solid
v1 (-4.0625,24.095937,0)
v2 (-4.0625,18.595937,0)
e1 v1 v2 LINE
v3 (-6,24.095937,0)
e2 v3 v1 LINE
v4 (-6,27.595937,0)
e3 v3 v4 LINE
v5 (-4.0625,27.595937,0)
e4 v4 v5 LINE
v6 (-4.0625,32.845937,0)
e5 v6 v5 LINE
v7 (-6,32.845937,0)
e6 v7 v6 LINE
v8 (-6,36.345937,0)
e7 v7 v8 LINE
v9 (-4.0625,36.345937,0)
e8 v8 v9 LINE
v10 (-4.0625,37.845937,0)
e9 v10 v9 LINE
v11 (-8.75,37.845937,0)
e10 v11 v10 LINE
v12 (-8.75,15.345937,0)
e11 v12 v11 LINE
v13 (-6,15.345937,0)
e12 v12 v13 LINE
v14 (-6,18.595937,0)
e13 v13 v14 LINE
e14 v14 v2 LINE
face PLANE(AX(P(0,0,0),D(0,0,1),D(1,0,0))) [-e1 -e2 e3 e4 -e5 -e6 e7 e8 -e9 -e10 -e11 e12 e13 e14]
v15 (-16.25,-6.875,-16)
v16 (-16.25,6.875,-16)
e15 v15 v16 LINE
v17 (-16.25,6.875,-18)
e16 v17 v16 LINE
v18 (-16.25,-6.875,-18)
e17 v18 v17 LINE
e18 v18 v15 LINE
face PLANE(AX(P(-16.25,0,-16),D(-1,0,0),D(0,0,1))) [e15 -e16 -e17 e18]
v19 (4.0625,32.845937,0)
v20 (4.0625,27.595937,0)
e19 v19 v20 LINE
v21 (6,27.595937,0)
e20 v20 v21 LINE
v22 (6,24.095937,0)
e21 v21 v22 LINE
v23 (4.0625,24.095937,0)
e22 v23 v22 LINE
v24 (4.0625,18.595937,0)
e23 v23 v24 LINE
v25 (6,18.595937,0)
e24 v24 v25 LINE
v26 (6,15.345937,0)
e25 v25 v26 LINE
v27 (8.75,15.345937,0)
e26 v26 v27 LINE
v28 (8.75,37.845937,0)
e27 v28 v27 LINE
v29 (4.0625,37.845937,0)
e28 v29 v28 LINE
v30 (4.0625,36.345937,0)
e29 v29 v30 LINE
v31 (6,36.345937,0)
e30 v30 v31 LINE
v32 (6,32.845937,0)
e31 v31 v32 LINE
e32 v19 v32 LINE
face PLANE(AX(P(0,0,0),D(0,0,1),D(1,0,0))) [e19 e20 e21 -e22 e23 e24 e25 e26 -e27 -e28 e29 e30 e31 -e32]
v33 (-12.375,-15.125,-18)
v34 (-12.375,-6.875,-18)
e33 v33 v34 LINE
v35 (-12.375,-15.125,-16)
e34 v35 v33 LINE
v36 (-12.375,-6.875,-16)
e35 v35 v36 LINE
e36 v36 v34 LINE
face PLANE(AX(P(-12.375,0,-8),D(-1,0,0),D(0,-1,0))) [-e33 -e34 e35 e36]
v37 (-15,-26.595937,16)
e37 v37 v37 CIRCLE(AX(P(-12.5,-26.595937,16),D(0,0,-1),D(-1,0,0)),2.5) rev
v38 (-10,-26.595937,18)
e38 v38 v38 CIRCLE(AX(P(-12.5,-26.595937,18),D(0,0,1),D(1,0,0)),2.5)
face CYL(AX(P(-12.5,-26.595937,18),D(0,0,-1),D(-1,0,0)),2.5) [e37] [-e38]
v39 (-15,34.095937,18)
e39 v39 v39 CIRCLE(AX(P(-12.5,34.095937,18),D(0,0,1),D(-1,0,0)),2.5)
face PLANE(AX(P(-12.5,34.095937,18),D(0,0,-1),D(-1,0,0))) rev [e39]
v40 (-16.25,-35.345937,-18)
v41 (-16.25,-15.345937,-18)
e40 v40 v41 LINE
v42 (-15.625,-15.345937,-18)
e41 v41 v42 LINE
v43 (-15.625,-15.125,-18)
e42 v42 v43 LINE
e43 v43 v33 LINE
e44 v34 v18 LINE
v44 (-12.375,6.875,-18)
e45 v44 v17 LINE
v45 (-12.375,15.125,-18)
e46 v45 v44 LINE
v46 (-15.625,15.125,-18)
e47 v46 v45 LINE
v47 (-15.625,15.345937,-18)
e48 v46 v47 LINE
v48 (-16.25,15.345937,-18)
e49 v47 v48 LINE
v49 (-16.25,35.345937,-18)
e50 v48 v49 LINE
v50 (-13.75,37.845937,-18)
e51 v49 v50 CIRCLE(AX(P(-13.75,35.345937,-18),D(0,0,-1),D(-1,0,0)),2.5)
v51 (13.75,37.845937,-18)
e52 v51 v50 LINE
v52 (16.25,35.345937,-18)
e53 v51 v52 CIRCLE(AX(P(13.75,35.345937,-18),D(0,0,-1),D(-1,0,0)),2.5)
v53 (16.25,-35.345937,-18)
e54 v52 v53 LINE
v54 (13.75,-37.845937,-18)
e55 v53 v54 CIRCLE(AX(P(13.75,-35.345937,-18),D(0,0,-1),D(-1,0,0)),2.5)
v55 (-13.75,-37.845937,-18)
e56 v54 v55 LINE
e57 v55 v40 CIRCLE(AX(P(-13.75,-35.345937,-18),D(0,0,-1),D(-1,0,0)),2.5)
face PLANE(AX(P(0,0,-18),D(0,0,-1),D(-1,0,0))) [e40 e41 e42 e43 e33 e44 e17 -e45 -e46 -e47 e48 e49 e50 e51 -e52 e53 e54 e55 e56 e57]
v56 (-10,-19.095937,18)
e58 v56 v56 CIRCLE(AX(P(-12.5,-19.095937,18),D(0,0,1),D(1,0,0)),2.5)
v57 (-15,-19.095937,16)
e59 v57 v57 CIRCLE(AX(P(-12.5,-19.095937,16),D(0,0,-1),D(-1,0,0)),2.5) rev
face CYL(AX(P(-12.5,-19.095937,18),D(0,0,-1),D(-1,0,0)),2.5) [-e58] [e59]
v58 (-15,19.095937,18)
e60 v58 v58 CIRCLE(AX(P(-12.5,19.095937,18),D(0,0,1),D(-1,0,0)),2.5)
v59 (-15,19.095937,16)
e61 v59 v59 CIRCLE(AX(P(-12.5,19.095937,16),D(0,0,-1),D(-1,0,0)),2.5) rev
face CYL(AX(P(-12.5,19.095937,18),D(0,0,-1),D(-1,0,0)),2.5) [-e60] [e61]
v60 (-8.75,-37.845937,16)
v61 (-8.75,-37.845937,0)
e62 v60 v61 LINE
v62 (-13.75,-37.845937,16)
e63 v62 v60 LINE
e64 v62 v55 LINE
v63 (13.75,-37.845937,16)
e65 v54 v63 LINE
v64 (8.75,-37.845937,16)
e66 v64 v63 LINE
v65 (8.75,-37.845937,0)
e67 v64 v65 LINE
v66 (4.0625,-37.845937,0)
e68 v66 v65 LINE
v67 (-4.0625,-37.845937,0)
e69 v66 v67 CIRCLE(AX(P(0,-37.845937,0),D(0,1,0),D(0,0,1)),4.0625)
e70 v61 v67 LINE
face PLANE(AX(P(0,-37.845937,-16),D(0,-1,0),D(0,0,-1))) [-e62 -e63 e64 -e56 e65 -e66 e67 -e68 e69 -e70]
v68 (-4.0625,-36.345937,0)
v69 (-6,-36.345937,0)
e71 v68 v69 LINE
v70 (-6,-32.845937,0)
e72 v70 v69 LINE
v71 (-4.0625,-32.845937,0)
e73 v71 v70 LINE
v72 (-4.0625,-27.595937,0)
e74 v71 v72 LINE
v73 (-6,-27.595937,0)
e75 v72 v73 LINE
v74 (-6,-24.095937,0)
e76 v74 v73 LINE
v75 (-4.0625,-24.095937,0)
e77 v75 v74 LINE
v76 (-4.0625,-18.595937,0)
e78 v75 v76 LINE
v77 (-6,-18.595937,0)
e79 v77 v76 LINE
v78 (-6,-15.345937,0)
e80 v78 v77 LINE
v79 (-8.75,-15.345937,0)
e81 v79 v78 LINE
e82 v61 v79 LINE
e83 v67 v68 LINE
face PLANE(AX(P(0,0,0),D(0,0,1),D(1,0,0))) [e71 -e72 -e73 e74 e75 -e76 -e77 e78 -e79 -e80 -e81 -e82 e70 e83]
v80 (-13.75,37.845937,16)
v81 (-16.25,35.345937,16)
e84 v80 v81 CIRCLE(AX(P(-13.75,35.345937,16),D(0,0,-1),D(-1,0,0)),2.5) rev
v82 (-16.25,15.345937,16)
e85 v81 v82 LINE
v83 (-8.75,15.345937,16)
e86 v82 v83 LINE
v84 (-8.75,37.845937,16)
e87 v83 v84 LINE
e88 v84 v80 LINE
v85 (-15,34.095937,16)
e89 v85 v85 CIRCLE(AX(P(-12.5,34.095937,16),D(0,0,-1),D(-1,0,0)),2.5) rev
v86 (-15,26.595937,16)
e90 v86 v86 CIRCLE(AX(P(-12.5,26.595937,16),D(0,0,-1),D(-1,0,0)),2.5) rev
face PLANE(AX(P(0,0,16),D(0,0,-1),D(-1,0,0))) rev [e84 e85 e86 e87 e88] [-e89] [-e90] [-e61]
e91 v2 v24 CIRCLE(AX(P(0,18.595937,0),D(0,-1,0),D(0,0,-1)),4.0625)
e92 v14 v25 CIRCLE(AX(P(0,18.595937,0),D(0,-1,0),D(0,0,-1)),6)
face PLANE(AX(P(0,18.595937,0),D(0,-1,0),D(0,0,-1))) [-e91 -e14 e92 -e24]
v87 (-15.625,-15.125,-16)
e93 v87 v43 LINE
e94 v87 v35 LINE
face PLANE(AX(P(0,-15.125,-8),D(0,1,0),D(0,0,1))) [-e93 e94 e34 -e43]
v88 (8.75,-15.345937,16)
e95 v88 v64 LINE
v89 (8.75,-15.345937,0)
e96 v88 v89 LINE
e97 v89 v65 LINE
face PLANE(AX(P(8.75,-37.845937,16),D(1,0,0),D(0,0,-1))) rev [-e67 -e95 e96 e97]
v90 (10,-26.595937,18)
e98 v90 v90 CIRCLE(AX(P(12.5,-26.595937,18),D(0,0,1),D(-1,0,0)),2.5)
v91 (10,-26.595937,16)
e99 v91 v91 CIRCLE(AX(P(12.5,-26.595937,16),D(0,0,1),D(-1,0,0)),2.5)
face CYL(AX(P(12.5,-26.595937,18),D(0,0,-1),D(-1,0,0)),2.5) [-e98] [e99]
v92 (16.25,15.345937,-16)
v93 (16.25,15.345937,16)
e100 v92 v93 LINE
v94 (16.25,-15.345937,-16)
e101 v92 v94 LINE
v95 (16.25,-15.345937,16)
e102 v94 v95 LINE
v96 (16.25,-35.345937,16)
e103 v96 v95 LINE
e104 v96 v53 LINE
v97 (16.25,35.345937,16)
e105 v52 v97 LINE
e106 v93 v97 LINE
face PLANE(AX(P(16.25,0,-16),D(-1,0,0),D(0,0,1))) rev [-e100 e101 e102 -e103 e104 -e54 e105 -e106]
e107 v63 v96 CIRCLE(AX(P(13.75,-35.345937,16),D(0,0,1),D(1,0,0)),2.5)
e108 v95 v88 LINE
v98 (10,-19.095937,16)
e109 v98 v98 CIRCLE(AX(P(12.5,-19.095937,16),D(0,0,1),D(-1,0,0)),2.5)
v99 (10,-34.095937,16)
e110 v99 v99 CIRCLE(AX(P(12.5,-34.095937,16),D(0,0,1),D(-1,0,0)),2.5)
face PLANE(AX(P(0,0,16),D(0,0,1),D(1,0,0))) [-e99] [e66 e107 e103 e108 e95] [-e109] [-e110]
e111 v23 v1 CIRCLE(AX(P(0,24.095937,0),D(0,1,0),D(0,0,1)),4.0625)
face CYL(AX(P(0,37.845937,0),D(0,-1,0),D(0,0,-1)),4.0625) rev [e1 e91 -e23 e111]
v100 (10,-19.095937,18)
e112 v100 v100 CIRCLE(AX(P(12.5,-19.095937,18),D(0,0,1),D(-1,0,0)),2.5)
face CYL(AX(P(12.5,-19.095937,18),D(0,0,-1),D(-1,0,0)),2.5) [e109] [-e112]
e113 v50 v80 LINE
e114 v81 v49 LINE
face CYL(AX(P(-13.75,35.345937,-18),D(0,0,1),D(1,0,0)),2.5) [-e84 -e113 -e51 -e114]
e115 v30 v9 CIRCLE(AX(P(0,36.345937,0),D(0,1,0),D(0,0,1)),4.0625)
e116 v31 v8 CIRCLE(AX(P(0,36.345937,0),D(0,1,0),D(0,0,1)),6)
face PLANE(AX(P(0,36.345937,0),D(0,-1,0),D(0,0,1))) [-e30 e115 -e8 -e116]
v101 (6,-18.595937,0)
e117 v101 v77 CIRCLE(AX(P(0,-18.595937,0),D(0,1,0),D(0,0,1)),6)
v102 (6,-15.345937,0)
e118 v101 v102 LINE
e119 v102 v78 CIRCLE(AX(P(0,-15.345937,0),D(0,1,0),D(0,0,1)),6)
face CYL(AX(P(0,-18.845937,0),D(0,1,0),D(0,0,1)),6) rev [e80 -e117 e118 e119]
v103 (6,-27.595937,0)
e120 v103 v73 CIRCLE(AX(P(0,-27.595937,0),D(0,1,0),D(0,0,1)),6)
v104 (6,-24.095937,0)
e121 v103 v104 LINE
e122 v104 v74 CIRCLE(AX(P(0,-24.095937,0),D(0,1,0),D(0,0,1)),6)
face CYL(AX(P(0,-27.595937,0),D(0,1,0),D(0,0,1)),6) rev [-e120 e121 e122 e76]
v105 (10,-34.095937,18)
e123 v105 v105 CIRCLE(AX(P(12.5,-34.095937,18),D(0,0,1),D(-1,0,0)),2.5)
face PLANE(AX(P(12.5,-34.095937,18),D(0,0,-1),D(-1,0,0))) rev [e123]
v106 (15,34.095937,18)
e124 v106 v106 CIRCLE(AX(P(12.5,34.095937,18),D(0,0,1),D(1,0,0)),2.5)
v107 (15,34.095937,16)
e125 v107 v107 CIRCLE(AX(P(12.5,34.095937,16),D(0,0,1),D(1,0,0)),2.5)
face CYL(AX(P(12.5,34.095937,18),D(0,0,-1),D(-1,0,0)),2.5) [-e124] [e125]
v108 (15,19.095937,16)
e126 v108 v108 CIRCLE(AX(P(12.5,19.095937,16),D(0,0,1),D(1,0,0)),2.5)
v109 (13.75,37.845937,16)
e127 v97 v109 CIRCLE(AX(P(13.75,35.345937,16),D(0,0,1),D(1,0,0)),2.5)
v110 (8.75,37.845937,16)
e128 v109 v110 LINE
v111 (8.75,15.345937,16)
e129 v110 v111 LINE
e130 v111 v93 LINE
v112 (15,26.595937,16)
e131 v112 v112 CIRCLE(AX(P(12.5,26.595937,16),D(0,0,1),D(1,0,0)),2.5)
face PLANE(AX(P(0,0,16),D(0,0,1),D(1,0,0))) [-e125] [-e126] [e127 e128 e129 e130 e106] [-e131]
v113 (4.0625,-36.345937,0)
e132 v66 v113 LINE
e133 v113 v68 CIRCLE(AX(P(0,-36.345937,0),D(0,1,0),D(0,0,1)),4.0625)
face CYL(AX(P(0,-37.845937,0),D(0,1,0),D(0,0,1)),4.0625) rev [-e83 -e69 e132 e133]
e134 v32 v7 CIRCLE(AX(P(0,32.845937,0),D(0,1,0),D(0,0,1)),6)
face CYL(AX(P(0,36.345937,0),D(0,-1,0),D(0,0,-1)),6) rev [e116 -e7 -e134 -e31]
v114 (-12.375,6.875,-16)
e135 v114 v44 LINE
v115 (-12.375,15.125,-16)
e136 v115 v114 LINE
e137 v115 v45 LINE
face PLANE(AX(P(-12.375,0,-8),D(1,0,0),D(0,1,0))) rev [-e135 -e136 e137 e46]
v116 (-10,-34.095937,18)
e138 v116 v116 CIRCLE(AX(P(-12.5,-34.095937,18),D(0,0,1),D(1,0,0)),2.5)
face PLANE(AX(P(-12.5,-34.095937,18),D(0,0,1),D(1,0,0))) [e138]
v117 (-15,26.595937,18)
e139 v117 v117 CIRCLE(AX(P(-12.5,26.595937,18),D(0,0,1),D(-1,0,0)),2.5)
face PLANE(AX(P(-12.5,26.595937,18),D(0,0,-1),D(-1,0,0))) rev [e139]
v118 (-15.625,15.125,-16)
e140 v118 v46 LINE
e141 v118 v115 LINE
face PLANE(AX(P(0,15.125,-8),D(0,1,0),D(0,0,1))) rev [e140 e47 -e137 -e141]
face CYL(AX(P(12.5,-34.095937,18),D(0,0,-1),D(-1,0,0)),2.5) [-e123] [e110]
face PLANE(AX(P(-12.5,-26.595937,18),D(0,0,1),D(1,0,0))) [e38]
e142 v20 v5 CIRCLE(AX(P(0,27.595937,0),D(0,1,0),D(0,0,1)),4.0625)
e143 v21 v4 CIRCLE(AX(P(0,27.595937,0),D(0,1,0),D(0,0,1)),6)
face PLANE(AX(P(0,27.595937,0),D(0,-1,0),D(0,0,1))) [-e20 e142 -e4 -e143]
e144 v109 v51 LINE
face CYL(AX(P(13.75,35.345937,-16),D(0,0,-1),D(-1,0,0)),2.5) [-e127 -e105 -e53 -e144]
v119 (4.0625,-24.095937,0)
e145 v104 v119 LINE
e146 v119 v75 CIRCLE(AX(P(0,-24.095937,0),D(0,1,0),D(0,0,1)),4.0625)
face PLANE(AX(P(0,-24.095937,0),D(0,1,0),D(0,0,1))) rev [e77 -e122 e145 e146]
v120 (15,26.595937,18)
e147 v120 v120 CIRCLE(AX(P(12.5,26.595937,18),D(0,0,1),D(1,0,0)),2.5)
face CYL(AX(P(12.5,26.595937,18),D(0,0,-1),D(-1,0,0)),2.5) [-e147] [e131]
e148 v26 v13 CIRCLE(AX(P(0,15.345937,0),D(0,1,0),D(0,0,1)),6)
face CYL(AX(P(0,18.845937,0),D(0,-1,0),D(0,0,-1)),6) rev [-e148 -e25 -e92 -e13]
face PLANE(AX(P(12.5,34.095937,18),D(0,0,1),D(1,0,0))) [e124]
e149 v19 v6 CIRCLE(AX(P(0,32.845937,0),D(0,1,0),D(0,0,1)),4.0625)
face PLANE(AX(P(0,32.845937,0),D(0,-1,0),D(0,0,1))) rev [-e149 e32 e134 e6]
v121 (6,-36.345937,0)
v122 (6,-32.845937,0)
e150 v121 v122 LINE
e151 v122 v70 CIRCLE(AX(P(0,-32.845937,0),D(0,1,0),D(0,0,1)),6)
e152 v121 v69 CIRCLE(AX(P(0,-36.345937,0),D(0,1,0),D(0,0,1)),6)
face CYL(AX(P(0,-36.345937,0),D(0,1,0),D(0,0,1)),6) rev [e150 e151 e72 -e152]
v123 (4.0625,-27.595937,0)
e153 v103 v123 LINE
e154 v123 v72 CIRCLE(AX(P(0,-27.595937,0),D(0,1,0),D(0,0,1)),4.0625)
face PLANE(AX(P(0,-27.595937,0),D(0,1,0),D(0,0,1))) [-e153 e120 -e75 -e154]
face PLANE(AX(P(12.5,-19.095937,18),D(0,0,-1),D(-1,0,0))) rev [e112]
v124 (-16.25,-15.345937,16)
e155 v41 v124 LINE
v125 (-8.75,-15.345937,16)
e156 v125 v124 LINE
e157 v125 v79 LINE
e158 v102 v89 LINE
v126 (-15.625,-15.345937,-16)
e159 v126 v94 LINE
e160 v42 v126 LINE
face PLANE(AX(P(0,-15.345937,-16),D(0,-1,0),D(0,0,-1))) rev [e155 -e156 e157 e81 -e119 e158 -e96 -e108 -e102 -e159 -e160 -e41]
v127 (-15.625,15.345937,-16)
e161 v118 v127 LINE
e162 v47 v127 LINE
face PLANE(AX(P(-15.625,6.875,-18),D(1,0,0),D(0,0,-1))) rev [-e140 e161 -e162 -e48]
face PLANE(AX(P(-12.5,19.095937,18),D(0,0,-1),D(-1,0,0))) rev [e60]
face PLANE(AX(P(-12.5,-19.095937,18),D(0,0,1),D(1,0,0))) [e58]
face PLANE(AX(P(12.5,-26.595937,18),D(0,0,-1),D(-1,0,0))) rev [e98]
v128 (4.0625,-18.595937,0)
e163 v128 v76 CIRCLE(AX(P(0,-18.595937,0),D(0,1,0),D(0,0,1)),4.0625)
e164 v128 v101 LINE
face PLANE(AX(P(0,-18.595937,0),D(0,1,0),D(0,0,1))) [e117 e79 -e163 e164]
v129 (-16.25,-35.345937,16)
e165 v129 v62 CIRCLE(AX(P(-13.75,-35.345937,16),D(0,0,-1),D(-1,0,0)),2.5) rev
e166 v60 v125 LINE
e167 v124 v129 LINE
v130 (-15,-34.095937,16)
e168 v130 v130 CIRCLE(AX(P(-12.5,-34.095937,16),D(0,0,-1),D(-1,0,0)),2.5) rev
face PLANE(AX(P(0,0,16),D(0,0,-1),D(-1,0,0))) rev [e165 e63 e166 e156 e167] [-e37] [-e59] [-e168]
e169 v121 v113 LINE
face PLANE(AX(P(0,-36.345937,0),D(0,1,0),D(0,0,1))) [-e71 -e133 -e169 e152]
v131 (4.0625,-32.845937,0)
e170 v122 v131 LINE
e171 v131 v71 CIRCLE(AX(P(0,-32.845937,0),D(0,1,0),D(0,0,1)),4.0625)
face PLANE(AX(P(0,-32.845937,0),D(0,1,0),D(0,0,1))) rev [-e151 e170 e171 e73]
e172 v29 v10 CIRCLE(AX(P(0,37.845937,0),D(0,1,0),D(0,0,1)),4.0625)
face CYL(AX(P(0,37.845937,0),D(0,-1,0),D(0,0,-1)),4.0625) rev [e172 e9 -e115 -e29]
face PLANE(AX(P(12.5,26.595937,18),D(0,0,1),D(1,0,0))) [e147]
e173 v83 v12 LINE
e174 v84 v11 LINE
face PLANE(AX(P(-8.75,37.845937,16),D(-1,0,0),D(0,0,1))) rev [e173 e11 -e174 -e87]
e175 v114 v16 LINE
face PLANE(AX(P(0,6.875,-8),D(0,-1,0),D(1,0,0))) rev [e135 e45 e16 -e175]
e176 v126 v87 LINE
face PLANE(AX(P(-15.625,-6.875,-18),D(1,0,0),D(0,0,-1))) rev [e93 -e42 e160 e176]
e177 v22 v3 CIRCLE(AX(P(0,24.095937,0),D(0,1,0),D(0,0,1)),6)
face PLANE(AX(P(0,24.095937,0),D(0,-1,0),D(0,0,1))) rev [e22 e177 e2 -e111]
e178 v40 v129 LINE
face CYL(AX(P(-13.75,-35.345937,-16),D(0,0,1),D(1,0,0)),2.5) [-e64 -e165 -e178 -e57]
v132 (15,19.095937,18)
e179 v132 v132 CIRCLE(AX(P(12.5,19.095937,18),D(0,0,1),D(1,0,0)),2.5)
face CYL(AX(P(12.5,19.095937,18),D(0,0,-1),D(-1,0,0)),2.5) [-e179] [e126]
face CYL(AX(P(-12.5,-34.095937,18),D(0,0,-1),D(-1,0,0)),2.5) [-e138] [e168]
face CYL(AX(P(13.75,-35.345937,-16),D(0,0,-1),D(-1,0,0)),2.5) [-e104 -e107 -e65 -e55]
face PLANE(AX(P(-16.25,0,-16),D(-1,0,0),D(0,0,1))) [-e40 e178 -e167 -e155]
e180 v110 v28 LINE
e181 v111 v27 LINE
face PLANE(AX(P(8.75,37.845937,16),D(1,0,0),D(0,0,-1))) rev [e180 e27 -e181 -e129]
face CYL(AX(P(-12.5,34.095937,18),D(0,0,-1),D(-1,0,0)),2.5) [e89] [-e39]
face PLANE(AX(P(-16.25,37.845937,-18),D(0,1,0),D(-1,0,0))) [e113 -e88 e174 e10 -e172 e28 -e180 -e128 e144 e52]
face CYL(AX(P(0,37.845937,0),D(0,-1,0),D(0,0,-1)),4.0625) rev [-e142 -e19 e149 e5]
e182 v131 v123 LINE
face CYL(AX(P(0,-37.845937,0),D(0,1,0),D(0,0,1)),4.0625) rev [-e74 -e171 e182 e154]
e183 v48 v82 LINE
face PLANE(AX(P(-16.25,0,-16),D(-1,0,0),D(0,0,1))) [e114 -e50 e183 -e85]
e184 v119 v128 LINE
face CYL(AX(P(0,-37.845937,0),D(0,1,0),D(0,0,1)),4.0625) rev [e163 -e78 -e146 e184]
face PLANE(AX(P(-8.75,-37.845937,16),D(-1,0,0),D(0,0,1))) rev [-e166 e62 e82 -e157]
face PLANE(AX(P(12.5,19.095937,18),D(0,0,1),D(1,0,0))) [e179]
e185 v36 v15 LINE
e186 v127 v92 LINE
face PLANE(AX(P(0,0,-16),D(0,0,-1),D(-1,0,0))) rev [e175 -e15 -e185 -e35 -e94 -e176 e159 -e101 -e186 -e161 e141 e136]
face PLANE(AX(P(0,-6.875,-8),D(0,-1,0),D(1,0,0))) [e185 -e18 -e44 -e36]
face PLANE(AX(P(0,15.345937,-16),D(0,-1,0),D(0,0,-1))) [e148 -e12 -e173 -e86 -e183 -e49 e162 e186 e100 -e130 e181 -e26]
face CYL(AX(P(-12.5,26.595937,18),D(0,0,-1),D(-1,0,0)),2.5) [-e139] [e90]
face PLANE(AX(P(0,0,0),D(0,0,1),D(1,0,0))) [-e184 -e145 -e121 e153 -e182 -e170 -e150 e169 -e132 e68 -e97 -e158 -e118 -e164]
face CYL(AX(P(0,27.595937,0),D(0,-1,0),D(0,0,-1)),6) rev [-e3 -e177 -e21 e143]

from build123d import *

# Parameters (mm, degrees)
SKETCH1_W                 = 32.5
SKETCH1_H                 = 22.5
BOSS_EXTRUDE1_DEPTH       = 16
SKETCH2_W                 = 32.5
SKETCH2_H                 = 37.845937441
BOSS_EXTRUDE2_DEPTH       = 2
CUT_EXTRUDE2_DEPTH        = 59.458857784
SKETCH3_R                 = 6
SKETCH3_R_2               = 4.0625
CUT_EXTRUDE1_DEPTH        = 3.5
LPATTERN1_COUNT           = 3
LPATTERN1_PITCH           = 8.75
MIRROR7_COPY_1_SKETCH_R   = 6
MIRROR7_COPY_1_SKETCH_R_2 = 4.0625
MIRROR7_COPY_1_DEPTH      = 3.5
MIRROR7_COPY_2_SKETCH_R   = 6
MIRROR7_COPY_2_SKETCH_R_2 = 4.0625
MIRROR7_COPY_2_DEPTH      = 3.5
MIRROR7_COPY_3_SKETCH_R   = 6
MIRROR7_COPY_3_SKETCH_R_2 = 4.0625
MIRROR7_COPY_3_DEPTH      = 3.5
SKETCH5_W                 = 7.5
SKETCH5_H                 = 22.5
BOSS_EXTRUDE6_DEPTH       = 16
SKETCH6_R                 = 2.5
BOSS_EXTRUDE7_DEPTH       = 2
SKETCH7_W                 = 3.25
SKETCH7_H                 = 8.25
CUT_EXTRUDE3_DEPTH        = 10
LPATTERN2_COUNT           = 2
LPATTERN2_PITCH           = 7.5
LPATTERN3_COUNT           = 2
LPATTERN3_PITCH           = 7.5
BOSS_EXTRUDE8_START       = -18.845937441
BOSS_EXTRUDE8_DEPTH       = 0.25
BOSS_EXTRUDE9_START       = 18.595937441
BOSS_EXTRUDE9_DEPTH       = 0.25
FILLET1_R                 = 2.5
SKETCH10_W                = 0.625
SKETCH10_H                = 8.470937441
CUT_EXTRUDE4_DEPTH        = 54.407653766


# Read off the part's stored shape, not the designer's step: Boss-Extrude8, Boss-Extrude9
with BuildPart() as part:
    # Sketch1 → Boss-Extrude1 (new body)
    with BuildSketch(Plane.XY):
        with Locations((0, -26.595937441)):
            Rectangle(SKETCH1_W, SKETCH1_H)
    boss_extrude1 = extrude(amount=-BOSS_EXTRUDE1_DEPTH)

    # Sketch2 → Boss-Extrude2 (add)
    with BuildSketch(Plane(origin=(0, 0, -16), x_dir=(-1, 0, 0), z_dir=(0, 0, -1))):
        with Locations((0, -18.922968721)):
            Rectangle(SKETCH2_W, SKETCH2_H)
    boss_extrude2 = extrude(amount=BOSS_EXTRUDE2_DEPTH)

    # Mirror4: Boss-Extrude2 across plane
    add(boss_extrude2.mirror(Plane(origin=(-16.25, 0, -18), x_dir=(0, 0, 1), z_dir=(0, -1, 0))))

    # Mirror5: Boss-Extrude1 across plane
    add(boss_extrude1.mirror(Plane.ZX))

    # Sketch3<3> → Cut-Extrude2 (cut, through all)
    with BuildSketch(Plane(origin=(0, -15.345937441, 0), x_dir=(1, 0, 0), z_dir=(0, 1, 0))):
        with BuildLine():
            Line((-4.0625, 0), (4.0625, 0))
            ThreePointArc((4.0625, 0), (0, 4.0625), (-4.0625, 0))
        make_face()
        with BuildLine():
            ThreePointArc((-4.0625, 0), (0, -4.0625), (4.0625, 0))
            Line((4.0625, 0), (-4.0625, 0))
        make_face()
    cut_extrude2 = extrude(amount=-CUT_EXTRUDE2_DEPTH, mode=Mode.SUBTRACT)

    # Sketch3 → Cut-Extrude1 (cut)
    with BuildSketch(Plane(origin=(0, -15.345937441, 0), x_dir=(1, 0, 0), z_dir=(0, 1, 0))):
        Circle(SKETCH3_R)
        Circle(SKETCH3_R_2, mode=Mode.SUBTRACT)
    cut_extrude1 = extrude(amount=-CUT_EXTRUDE1_DEPTH, mode=Mode.SUBTRACT)

    # LPattern1: Cut-Extrude1 ×3
    with Locations(*[(0, -i * LPATTERN1_PITCH, 0) for i in range(1, LPATTERN1_COUNT)]):
        add(cut_extrude1, mode=Mode.SUBTRACT)

    # Mirror6: Cut-Extrude2, Cut-Extrude1 across plane
    add(cut_extrude2.mirror(Plane.ZX), mode=Mode.SUBTRACT)
    add(cut_extrude1.mirror(Plane.ZX), mode=Mode.SUBTRACT)

    # Mirror6 at the second plane: Cut-Extrude2, Cut-Extrude1 across plane
    add(cut_extrude2.mirror(Plane.XY), mode=Mode.SUBTRACT)
    add(cut_extrude1.mirror(Plane.XY), mode=Mode.SUBTRACT)

    # Mirror7 copy 1 sketch → Mirror7 copy 1 (cut)
    with BuildSketch(Plane.XZ.offset(-24.095937441)):
        Circle(MIRROR7_COPY_1_SKETCH_R)
        Circle(MIRROR7_COPY_1_SKETCH_R_2, mode=Mode.SUBTRACT)
    extrude(amount=-MIRROR7_COPY_1_DEPTH, mode=Mode.SUBTRACT)

    # Mirror7 copy 2 sketch → Mirror7 copy 2 (cut)
    with BuildSketch(Plane.XZ.offset(-32.845937441)):
        Circle(MIRROR7_COPY_2_SKETCH_R)
        Circle(MIRROR7_COPY_2_SKETCH_R_2, mode=Mode.SUBTRACT)
    extrude(amount=-MIRROR7_COPY_2_DEPTH, mode=Mode.SUBTRACT)

    # Mirror7 copy 3 sketch → Mirror7 copy 3 (cut)
    with BuildSketch(Plane.XZ.offset(-15.345937441)):
        Circle(MIRROR7_COPY_3_SKETCH_R)
        Circle(MIRROR7_COPY_3_SKETCH_R_2, mode=Mode.SUBTRACT)
    extrude(amount=-MIRROR7_COPY_3_DEPTH, mode=Mode.SUBTRACT)

    # Sketch5 → Boss-Extrude6 (add)
    with BuildSketch(Plane.XY):
        with Locations((-12.5, -26.595937441)):
            Rectangle(SKETCH5_W, SKETCH5_H)
        with Locations((12.5, -26.595937441)):
            Rectangle(SKETCH5_W, SKETCH5_H)
        with Locations((12.5, 26.595937441)):
            Rectangle(SKETCH5_W, SKETCH5_H)
        with Locations((-12.5, 26.595937441)):
            Rectangle(SKETCH5_W, SKETCH5_H)
    extrude(amount=BOSS_EXTRUDE6_DEPTH)

    # Sketch6 → Boss-Extrude7 (add)
    with BuildSketch(Plane.XY.offset(16)):
        with Locations(Location((-12.5, -26.595937441, 0), (0, 0, 180))):
            Circle(SKETCH6_R)
        with Locations(Location((-12.5, 26.595937441, 0), (0, 0, 180))):
            Circle(SKETCH6_R)
        with Locations((12.5, 26.595937441)):
            Circle(SKETCH6_R)
        with Locations(Location((12.5, -26.595937441, 0), (0, 0, 180))):
            Circle(SKETCH6_R)
    boss_extrude7 = extrude(amount=BOSS_EXTRUDE7_DEPTH)

    # Sketch7 → Cut-Extrude3 (cut)
    with BuildSketch(Plane(origin=(0, 0, -18), x_dir=(-1, 0, 0), z_dir=(0, 0, -1))):
        with Locations((14, -11)):
            Rectangle(SKETCH7_W, SKETCH7_H)
        with Locations((14, 11)):
            Rectangle(SKETCH7_W, SKETCH7_H)
    extrude(amount=-CUT_EXTRUDE3_DEPTH, mode=Mode.SUBTRACT)

    # LPattern2: Boss-Extrude7 ×2
    with Locations(*[(0, -i * LPATTERN2_PITCH, 0) for i in range(1, LPATTERN2_COUNT)]):
        add(boss_extrude7)

    # LPattern3: Boss-Extrude7 ×2
    with Locations(*[(0, i * LPATTERN3_PITCH, 0) for i in range(1, LPATTERN3_COUNT)]):
        add(boss_extrude7)

    # Boss-Extrude8 outline → Boss-Extrude8 (add)
    with BuildSketch(Plane(origin=(0, 0, 0), x_dir=(1, 0, 0), z_dir=(0, 1, 0)).offset(BOSS_EXTRUDE8_START)):
        with BuildLine():
            ThreePointArc((-4.0625, 0), (0, 4.0625), (4.0625, 0))
            Line((4.0625, 0), (6, 0))
            ThreePointArc((6, 0), (0, 6), (-6, 0))
            Line((-6, 0), (-4.0625, 0))
        make_face()
    extrude(amount=BOSS_EXTRUDE8_DEPTH)

    # Boss-Extrude9 outline → Boss-Extrude9 (add)
    with BuildSketch(Plane(origin=(0, 0, 0), x_dir=(1, 0, 0), z_dir=(0, 1, 0)).offset(BOSS_EXTRUDE9_START)):
        with BuildLine():
            ThreePointArc((6, 0), (0, 6), (-6, 0))
            Line((-6, 0), (-4.0625, 0))
            ThreePointArc((-4.0625, 0), (0, 4.0625), (4.0625, 0))
            Line((4.0625, 0), (6, 0))
        make_face()
    extrude(amount=BOSS_EXTRUDE9_DEPTH)

    # Fillet1
    fillet1_edges = [part.edges().sort_by_distance(p)[0] for p in [
        (-16.25, 37.845937441, -1),
        (16.25, 37.845937441, -1),
        (16.25, -37.845937441, -1),
        (-16.25, -37.845937441, -1),
    ]]
    fillet(fillet1_edges, radius=FILLET1_R)

    # Sketch10 → Cut-Extrude4 (cut, through all)
    with BuildSketch(Plane.XY.offset(-16)):
        with Locations((-15.9375, 11.110468721)):
            Rectangle(SKETCH10_W, SKETCH10_H)
        with Locations((-15.9375, -11.110468721)):
            Rectangle(SKETCH10_W, SKETCH10_H)
    extrude(amount=-CUT_EXTRUDE4_DEPTH, mode=Mode.SUBTRACT)


solid = part.part
